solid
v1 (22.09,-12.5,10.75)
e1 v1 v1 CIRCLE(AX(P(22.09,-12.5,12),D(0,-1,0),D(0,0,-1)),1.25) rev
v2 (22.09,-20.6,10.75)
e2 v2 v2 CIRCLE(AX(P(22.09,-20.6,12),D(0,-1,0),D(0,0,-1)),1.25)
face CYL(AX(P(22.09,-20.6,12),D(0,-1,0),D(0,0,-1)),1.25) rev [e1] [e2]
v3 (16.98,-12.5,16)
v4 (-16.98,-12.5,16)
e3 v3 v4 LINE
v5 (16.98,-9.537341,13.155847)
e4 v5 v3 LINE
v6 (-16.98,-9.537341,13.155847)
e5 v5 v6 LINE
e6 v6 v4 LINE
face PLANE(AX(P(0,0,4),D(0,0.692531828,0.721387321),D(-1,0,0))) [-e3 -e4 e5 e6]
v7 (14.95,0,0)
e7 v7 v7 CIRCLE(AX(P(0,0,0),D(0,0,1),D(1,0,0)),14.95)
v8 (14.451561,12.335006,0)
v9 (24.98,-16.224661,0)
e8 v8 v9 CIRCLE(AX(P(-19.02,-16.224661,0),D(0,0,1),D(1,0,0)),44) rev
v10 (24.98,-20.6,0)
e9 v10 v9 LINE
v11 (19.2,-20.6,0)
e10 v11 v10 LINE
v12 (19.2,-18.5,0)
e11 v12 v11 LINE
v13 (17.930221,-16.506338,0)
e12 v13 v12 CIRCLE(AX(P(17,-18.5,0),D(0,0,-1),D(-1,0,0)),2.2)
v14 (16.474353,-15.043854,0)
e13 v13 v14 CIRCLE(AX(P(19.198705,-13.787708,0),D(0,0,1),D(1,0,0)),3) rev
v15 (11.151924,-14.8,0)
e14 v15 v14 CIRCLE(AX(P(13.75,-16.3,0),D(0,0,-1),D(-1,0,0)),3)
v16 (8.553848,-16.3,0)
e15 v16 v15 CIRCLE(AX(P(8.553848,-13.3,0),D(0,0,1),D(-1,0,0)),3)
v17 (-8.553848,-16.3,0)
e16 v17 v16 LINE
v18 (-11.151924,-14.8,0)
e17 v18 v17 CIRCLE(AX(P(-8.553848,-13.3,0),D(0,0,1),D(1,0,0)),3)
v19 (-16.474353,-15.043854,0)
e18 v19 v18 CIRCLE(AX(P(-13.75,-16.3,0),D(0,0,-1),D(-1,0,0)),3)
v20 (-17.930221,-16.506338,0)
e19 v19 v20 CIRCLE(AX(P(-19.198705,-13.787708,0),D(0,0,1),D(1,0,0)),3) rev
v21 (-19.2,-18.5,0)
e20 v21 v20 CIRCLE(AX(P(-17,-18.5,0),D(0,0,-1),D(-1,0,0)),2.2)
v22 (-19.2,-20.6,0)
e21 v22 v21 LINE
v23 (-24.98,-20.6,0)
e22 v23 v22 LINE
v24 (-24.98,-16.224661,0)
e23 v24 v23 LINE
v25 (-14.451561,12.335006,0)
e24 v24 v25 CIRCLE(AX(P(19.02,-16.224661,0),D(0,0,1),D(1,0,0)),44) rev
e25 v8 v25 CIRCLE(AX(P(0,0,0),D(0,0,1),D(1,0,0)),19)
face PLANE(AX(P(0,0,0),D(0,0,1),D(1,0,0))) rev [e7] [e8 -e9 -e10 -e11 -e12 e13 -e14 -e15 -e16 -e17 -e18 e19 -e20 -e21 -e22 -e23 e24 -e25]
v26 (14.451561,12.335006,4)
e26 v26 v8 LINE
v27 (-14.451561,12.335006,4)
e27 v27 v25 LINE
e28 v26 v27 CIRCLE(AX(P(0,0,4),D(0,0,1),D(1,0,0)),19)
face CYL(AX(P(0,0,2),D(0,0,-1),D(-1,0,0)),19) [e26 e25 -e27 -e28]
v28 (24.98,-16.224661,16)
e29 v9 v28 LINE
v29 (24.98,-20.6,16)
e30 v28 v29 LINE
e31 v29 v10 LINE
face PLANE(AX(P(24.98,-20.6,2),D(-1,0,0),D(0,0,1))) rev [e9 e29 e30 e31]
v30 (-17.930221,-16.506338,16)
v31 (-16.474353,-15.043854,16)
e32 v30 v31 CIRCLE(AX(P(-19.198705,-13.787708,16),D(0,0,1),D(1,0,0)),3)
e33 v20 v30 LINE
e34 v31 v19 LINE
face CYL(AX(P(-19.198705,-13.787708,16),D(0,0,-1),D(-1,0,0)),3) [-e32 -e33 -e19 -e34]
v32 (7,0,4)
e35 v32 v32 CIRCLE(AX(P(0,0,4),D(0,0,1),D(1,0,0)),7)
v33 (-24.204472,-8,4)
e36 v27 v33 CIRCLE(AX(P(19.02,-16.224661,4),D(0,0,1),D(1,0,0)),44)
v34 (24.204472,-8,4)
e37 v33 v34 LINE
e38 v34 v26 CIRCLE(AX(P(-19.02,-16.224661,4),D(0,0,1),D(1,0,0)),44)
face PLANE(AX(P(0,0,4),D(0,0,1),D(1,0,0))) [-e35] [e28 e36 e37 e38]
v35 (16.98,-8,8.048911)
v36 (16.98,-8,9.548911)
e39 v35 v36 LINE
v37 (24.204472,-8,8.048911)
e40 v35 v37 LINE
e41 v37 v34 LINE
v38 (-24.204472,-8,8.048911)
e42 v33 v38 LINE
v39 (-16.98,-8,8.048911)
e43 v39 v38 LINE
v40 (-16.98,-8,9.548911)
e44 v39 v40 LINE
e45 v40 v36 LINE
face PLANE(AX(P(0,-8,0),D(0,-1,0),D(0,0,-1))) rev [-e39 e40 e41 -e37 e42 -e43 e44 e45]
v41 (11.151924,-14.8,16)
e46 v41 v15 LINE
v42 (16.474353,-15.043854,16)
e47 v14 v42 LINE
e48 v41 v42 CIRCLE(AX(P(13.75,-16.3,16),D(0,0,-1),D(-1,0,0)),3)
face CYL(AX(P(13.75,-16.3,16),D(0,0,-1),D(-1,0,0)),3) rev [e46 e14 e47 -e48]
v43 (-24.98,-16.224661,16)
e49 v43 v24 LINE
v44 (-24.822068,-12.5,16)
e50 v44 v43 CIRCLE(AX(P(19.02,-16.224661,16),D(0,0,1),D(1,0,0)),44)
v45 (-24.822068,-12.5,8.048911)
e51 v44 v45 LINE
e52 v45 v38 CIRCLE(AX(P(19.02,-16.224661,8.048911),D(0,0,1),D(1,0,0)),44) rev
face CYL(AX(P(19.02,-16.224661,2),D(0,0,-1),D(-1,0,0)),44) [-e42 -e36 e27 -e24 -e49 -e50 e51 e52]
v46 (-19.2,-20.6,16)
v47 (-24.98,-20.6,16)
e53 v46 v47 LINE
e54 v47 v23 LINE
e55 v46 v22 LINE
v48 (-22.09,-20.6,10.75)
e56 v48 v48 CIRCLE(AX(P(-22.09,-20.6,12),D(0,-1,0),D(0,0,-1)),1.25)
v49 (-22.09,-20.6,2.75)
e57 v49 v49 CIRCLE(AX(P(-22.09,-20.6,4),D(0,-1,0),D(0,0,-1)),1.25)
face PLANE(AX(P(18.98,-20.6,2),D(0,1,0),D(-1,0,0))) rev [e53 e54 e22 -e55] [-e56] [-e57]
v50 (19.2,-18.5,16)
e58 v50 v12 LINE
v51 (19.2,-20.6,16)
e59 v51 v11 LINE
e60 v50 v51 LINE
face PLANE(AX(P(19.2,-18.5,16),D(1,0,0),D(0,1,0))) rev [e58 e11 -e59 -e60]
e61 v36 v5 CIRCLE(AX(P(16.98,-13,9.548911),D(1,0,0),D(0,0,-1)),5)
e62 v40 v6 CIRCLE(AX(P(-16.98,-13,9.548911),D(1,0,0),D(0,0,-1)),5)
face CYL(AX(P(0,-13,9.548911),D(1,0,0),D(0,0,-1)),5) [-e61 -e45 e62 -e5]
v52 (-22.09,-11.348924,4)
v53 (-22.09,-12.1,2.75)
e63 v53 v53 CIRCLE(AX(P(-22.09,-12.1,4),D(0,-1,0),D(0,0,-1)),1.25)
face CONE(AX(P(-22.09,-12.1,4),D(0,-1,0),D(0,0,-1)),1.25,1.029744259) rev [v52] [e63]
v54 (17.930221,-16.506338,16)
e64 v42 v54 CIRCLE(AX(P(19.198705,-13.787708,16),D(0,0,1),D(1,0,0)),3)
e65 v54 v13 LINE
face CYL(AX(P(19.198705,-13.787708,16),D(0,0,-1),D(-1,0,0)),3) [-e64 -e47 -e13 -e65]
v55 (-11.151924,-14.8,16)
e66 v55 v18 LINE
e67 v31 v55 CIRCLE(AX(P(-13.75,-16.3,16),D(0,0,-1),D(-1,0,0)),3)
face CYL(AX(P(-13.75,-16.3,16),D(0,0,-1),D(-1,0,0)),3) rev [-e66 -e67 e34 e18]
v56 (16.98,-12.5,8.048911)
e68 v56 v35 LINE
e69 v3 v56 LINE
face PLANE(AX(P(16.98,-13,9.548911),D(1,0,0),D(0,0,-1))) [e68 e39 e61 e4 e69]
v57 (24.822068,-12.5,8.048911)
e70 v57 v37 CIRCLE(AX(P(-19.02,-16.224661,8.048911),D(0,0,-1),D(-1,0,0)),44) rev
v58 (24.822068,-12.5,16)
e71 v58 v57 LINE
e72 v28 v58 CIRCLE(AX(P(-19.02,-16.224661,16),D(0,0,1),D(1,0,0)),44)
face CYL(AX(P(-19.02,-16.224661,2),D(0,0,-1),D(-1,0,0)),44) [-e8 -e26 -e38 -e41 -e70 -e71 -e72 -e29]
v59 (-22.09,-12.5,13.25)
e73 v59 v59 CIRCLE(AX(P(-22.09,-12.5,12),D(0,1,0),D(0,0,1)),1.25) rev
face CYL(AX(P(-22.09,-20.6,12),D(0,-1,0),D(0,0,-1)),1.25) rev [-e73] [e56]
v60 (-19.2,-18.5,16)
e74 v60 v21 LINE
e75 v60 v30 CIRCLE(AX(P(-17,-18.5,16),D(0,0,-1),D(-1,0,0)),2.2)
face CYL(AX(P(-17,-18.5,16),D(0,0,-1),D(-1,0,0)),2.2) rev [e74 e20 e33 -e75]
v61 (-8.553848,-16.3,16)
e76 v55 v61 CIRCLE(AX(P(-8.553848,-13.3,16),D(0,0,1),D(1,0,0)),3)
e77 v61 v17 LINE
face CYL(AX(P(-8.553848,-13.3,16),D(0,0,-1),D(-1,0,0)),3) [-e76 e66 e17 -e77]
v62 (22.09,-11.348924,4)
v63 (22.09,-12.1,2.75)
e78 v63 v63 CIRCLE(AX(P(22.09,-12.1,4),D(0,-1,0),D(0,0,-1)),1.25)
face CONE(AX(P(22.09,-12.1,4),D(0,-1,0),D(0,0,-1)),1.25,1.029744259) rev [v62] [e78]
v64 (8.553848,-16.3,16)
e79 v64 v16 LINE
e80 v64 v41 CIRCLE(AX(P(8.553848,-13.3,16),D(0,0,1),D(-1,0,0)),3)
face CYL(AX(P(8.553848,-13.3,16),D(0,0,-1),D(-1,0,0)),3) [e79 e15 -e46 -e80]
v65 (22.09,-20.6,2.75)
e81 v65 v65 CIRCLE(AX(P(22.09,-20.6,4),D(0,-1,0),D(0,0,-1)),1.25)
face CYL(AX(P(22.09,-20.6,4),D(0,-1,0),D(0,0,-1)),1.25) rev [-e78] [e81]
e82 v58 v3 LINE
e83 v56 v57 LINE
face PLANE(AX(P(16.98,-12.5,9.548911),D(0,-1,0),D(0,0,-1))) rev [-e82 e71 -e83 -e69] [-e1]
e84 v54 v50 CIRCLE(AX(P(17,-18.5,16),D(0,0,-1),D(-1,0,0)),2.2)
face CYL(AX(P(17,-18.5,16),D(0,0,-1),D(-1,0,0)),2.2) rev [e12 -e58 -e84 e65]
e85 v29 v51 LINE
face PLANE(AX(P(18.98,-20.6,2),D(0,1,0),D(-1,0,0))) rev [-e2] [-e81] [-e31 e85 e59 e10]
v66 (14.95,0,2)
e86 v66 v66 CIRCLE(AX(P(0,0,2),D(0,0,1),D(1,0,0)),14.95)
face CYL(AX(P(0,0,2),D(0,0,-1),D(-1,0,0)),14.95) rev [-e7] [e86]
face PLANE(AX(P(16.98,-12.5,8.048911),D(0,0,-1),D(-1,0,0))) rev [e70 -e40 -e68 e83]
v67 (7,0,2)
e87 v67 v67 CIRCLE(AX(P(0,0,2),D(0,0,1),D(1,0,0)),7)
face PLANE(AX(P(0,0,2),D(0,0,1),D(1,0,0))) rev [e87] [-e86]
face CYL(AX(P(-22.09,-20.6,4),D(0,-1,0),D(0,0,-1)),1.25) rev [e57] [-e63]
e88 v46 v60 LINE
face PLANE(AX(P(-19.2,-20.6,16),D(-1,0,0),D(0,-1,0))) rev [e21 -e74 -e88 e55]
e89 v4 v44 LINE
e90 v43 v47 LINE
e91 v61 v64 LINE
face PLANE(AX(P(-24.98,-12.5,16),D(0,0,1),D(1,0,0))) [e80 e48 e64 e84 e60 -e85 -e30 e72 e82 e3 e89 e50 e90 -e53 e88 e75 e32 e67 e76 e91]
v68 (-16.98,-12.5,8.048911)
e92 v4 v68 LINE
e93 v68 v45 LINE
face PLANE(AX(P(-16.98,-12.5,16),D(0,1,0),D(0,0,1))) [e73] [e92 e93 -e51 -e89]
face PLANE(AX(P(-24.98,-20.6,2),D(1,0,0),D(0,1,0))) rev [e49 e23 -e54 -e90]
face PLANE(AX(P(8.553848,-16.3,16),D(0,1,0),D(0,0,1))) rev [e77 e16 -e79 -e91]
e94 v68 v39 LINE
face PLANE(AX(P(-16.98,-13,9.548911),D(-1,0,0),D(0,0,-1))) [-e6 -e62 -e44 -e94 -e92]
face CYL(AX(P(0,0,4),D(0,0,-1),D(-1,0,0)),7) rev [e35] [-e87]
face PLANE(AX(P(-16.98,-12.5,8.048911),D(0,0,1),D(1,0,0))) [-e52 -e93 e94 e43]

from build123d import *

# Parameters (mm, degrees)
ESBO_O1_R                     = 14.95
RESSALTO_EXTRUS_O1_DEPTH      = 2
ESBO_O2_R                     = 7
RESSALTO_EXTRUS_O2_DEPTH      = 2
ESBO_O3_W                     = 49.96
ESBO_O3_H                     = 12
RESSALTO_EXTRUS_O3_DEPTH      = 8.1
CHANFRO1_SIZE                 = 12.5
CHANFRO1_SIZE_2               = 12
FILETE1_R                     = 44
CORTE_EXTRUS_O1_REACH         = 38.116
CORTE_EXTRUS_O2_DEPTH         = 37.115930003
ESBO_O7_W                     = 49.64413541
ESBO_O7_H                     = 12
CORTE_EXTRUS_O5_DEPTH         = 8
FILETE2_R                     = 5
FURO_ROSCADO_DE_M3X0_51_D     = 2.5
FURO_ROSCADO_DE_M3X0_51_DEPTH = 8.5
FURO_ROSCADO_DE_M3X0_51_TIP   = 0.751075774
CORTE_EXTRUS_O6_DEPTH         = 8
FILETE3_R                     = 3


with BuildPart() as part:
    # Esboço1 → Ressalto-extrusão1 (new body)
    with BuildSketch(Plane.XY):
        with BuildLine():
            Line((-24.98, -20.6), (-24.98, 0))
            Line((-24.98, 0), (-14.451561249, 12.33500618))
            ThreePointArc((-14.451561249, 12.33500618), (0, 19), (14.451561249, 12.33500618))
            Line((14.451561249, 12.33500618), (24.98, 0))
            Line((24.98, 0), (24.98, -20.6))
            Line((24.98, -20.6), (18.98, -20.6))
            Line((18.98, -20.6), (-18.98, -20.6))
            Line((-18.98, -20.6), (-24.98, -20.6))
        make_face()
        Circle(ESBO_O1_R, mode=Mode.SUBTRACT)
    extrude(amount=RESSALTO_EXTRUS_O1_DEPTH)

    # Esboço2 → Ressalto-extrusão2 (add)
    with BuildSketch(Plane.XY.offset(2)):
        with BuildLine():
            Line((24.98, 0), (14.451561249, 12.33500618))
            ThreePointArc((14.451561249, 12.33500618), (0, 19), (-14.451561249, 12.33500618))
            Line((-14.451561249, 12.33500618), (-24.98, 0))
            Line((-24.98, 0), (-24.98, -20.6))
            Line((-24.98, -20.6), (24.98, -20.6))
            Line((24.98, -20.6), (24.98, 0))
        make_face()
        Circle(ESBO_O2_R, mode=Mode.SUBTRACT)
    extrude(amount=RESSALTO_EXTRUS_O2_DEPTH)

    # Esboço3 → Ressalto-extrusão3 (add)
    with BuildSketch(Plane.XZ.offset(20.6)):
        with Locations((0, 10)):
            Rectangle(ESBO_O3_W, ESBO_O3_H)
    extrude(amount=-RESSALTO_EXTRUS_O3_DEPTH)

    # Chanfro1
    # the kernel refuses this chamfer: 12.5, 12 mm, written as the material it adds along each edge
    with BuildSketch(Plane(origin=(-24.98, -12.5, 4), x_dir=(-1.156063365908983e-15, 0.9996377364334812, -0.026914603808079415), z_dir=(1, 0, 0))) as chanfro1_piece_1_section:
        Polygon((CHANFRO1_SIZE * 0.999637736433, CHANFRO1_SIZE * 0.0269146038081), (-CHANFRO1_SIZE_2 * 0.0269146038081, CHANFRO1_SIZE_2 * 0.999637736433), (0, 0), align=None)
    chanfro1_piece_1 = extrude(amount=49.96, mode=Mode.PRIVATE)
    chanfro1_piece_1 = chanfro1_piece_1 - Plane(origin=(0, 0, 8.125756992), x_dir=(1, 0, 0), z_dir=(0, 0, -1)) * Cylinder(7, 150, mode=Mode.PRIVATE)
    add(chanfro1_piece_1)

    # Filete1
    # the kernel refuses this fillet: 44 mm, written as the material it takes off along each edge
    with BuildSketch(Plane(origin=(-24.98, 0, 44.561650607), x_dir=(0.6492108903913877, 0.7606084536719413, 0), z_dir=(0, 0, -1)), Plane(origin=(24.98, 0, -40.561650607), x_dir=(-0.6492108903913875, 0.7606084536719414, 0), z_dir=(0, 0, 1))) as filete1_piece_1:
        with BuildLine():
            CenterArc((16.224665438, 43.999998084), FILETE1_R, 229.517867219, 40.465225033)
            Line((-12.340613739, 10.533226123), (-15.197141656, 7.186548926))
            Line((-15.197141656, 7.186548926), (-1.622466416, -4.399999917))
            Line((-1.622466416, -4.399999917), (16.210382799, -4.399999808))
            Line((16.210382799, -4.399999808), (16.211681221, 0))
        make_face()
    extrude(amount=85.123301215, mode=Mode.SUBTRACT)

    # Esboço4 → Corte-extrusão1 (cut, up to next)
    with BuildSketch(Plane.XY.offset(16), mode=Mode.PRIVATE) as corte_extrus_o1_sk1:
        with BuildLine():
            Line((17, -16.5), (-17, -16.5))
            ThreePointArc((-17, -16.5), (-18.414213562, -17.085786438), (-19, -18.5))
            Line((-19, -18.5), (-19, -20.6))
            Line((-19, -20.6), (19, -20.6))
            Line((19, -20.6), (19, -18.5))
            ThreePointArc((19, -18.5), (18.414213562, -17.085786438), (17, -16.5))
        make_face()
    corte_extrus_o1_tool1 = extrude(corte_extrus_o1_sk1.sketch, amount=-CORTE_EXTRUS_O1_REACH, mode=Mode.PRIVATE) & part.part
    add(corte_extrus_o1_tool1.solids().sort_by_distance((0, -18.567864, 16))[0], mode=Mode.SUBTRACT)

    # Esboço6 → Corte-extrusão2 (cut, through all)
    with BuildSketch(Plane(origin=(0, 0, 0), x_dir=(-1, 0, 0), z_dir=(0, 0, -1))):
        with BuildLine():
            Line((17, -16.3), (16.75, -16.3))
            ThreePointArc((16.75, -16.3), (14.526457135, -13.402222521), (11.151923789, -14.8))
            ThreePointArc((11.151923789, -14.8), (10.053847577, -15.898076211), (8.553847577, -16.3))
            Line((8.553847577, -16.3), (-8.553847577, -16.3))
            ThreePointArc((-8.553847577, -16.3), (-10.053847577, -15.898076211), (-11.151923789, -14.8))
            ThreePointArc((-11.151923789, -14.8), (-14.526457135, -13.402222521), (-16.75, -16.3))
            Line((-16.75, -16.3), (-17, -16.3))
            ThreePointArc((-17, -16.3), (-18.555634919, -16.944365081), (-19.2, -18.5))
            Line((-19.2, -18.5), (-19.2, -20.6))
            Line((-19.2, -20.6), (19.2, -20.6))
            Line((19.2, -20.6), (19.2, -18.5))
            ThreePointArc((19.2, -18.5), (18.555634919, -16.944365081), (17, -16.3))
        make_face()
    extrude(amount=-CORTE_EXTRUS_O2_DEPTH, mode=Mode.SUBTRACT)

    # Esboço7 → Corte-extrusão5 (cut)
    with BuildSketch(Plane(origin=(0, 0, 0), x_dir=(-1, 0, 0), z_dir=(0, -1, 0))):
        with Locations((0, -10)):
            Rectangle(ESBO_O7_W, ESBO_O7_H)
    extrude(amount=CORTE_EXTRUS_O5_DEPTH, mode=Mode.SUBTRACT)

    # Filete2
    filete2_edges = [part.edges().sort_by_distance(p)[0] for p in [
        (0, -8, 11.68),
    ]]
    fillet(filete2_edges, radius=FILETE2_R)

    # Furo roscado de M3x0.51
    with Locations(Plane.XZ.offset(20.6)):
        with Locations((22.09, 4), (22.09, 12), (-22.09, 4), (-22.09, 12)):
            Hole(FURO_ROSCADO_DE_M3X0_51_D / 2, depth=FURO_ROSCADO_DE_M3X0_51_DEPTH)
            with Locations((0, 0, -(FURO_ROSCADO_DE_M3X0_51_DEPTH + FURO_ROSCADO_DE_M3X0_51_TIP / 2))):  # 118° drill point
                Cone(0, FURO_ROSCADO_DE_M3X0_51_D / 2, FURO_ROSCADO_DE_M3X0_51_TIP, mode=Mode.SUBTRACT)

    # Esboço12 → Corte-extrusão6 (cut)
    with BuildSketch(Plane(origin=(24.98, 0, 0), x_dir=(0, 0, -1), z_dir=(1, 0, 0))):
        with BuildLine():
            Line((-9.54891062, -12.5), (-8.04891062, -12.5))
            Line((-8.04891062, -12.5), (-8.04891062, -8))
            Line((-8.04891062, -8), (-9.54891062, -8))
            ThreePointArc((-9.54891062, -8), (-11.509357545, -8.400364378), (-13.155847225, -9.537340859))
            Line((-13.155847225, -9.537340859), (-16, -12.5))
            Line((-16, -12.5), (-9.54891062, -12.5))
        make_face()
    corte_extrus_o6 = extrude(amount=-CORTE_EXTRUS_O6_DEPTH, mode=Mode.SUBTRACT)

    # Espelhar1: Corte-extrusão6 across plane
    add(corte_extrus_o6.mirror(Plane(origin=(0, 0, 0), x_dir=(0, 0, 1), z_dir=(1, 0, 0))), mode=Mode.SUBTRACT)

    # Filete3
    filete3_edges = [part.edges().sort_by_distance(p)[0] for p in [
        (16.75, -16.3, 8),
        (-16.75, -16.3, 8),
    ]]
    fillet(filete3_edges, radius=FILETE3_R)


solid = part.part
